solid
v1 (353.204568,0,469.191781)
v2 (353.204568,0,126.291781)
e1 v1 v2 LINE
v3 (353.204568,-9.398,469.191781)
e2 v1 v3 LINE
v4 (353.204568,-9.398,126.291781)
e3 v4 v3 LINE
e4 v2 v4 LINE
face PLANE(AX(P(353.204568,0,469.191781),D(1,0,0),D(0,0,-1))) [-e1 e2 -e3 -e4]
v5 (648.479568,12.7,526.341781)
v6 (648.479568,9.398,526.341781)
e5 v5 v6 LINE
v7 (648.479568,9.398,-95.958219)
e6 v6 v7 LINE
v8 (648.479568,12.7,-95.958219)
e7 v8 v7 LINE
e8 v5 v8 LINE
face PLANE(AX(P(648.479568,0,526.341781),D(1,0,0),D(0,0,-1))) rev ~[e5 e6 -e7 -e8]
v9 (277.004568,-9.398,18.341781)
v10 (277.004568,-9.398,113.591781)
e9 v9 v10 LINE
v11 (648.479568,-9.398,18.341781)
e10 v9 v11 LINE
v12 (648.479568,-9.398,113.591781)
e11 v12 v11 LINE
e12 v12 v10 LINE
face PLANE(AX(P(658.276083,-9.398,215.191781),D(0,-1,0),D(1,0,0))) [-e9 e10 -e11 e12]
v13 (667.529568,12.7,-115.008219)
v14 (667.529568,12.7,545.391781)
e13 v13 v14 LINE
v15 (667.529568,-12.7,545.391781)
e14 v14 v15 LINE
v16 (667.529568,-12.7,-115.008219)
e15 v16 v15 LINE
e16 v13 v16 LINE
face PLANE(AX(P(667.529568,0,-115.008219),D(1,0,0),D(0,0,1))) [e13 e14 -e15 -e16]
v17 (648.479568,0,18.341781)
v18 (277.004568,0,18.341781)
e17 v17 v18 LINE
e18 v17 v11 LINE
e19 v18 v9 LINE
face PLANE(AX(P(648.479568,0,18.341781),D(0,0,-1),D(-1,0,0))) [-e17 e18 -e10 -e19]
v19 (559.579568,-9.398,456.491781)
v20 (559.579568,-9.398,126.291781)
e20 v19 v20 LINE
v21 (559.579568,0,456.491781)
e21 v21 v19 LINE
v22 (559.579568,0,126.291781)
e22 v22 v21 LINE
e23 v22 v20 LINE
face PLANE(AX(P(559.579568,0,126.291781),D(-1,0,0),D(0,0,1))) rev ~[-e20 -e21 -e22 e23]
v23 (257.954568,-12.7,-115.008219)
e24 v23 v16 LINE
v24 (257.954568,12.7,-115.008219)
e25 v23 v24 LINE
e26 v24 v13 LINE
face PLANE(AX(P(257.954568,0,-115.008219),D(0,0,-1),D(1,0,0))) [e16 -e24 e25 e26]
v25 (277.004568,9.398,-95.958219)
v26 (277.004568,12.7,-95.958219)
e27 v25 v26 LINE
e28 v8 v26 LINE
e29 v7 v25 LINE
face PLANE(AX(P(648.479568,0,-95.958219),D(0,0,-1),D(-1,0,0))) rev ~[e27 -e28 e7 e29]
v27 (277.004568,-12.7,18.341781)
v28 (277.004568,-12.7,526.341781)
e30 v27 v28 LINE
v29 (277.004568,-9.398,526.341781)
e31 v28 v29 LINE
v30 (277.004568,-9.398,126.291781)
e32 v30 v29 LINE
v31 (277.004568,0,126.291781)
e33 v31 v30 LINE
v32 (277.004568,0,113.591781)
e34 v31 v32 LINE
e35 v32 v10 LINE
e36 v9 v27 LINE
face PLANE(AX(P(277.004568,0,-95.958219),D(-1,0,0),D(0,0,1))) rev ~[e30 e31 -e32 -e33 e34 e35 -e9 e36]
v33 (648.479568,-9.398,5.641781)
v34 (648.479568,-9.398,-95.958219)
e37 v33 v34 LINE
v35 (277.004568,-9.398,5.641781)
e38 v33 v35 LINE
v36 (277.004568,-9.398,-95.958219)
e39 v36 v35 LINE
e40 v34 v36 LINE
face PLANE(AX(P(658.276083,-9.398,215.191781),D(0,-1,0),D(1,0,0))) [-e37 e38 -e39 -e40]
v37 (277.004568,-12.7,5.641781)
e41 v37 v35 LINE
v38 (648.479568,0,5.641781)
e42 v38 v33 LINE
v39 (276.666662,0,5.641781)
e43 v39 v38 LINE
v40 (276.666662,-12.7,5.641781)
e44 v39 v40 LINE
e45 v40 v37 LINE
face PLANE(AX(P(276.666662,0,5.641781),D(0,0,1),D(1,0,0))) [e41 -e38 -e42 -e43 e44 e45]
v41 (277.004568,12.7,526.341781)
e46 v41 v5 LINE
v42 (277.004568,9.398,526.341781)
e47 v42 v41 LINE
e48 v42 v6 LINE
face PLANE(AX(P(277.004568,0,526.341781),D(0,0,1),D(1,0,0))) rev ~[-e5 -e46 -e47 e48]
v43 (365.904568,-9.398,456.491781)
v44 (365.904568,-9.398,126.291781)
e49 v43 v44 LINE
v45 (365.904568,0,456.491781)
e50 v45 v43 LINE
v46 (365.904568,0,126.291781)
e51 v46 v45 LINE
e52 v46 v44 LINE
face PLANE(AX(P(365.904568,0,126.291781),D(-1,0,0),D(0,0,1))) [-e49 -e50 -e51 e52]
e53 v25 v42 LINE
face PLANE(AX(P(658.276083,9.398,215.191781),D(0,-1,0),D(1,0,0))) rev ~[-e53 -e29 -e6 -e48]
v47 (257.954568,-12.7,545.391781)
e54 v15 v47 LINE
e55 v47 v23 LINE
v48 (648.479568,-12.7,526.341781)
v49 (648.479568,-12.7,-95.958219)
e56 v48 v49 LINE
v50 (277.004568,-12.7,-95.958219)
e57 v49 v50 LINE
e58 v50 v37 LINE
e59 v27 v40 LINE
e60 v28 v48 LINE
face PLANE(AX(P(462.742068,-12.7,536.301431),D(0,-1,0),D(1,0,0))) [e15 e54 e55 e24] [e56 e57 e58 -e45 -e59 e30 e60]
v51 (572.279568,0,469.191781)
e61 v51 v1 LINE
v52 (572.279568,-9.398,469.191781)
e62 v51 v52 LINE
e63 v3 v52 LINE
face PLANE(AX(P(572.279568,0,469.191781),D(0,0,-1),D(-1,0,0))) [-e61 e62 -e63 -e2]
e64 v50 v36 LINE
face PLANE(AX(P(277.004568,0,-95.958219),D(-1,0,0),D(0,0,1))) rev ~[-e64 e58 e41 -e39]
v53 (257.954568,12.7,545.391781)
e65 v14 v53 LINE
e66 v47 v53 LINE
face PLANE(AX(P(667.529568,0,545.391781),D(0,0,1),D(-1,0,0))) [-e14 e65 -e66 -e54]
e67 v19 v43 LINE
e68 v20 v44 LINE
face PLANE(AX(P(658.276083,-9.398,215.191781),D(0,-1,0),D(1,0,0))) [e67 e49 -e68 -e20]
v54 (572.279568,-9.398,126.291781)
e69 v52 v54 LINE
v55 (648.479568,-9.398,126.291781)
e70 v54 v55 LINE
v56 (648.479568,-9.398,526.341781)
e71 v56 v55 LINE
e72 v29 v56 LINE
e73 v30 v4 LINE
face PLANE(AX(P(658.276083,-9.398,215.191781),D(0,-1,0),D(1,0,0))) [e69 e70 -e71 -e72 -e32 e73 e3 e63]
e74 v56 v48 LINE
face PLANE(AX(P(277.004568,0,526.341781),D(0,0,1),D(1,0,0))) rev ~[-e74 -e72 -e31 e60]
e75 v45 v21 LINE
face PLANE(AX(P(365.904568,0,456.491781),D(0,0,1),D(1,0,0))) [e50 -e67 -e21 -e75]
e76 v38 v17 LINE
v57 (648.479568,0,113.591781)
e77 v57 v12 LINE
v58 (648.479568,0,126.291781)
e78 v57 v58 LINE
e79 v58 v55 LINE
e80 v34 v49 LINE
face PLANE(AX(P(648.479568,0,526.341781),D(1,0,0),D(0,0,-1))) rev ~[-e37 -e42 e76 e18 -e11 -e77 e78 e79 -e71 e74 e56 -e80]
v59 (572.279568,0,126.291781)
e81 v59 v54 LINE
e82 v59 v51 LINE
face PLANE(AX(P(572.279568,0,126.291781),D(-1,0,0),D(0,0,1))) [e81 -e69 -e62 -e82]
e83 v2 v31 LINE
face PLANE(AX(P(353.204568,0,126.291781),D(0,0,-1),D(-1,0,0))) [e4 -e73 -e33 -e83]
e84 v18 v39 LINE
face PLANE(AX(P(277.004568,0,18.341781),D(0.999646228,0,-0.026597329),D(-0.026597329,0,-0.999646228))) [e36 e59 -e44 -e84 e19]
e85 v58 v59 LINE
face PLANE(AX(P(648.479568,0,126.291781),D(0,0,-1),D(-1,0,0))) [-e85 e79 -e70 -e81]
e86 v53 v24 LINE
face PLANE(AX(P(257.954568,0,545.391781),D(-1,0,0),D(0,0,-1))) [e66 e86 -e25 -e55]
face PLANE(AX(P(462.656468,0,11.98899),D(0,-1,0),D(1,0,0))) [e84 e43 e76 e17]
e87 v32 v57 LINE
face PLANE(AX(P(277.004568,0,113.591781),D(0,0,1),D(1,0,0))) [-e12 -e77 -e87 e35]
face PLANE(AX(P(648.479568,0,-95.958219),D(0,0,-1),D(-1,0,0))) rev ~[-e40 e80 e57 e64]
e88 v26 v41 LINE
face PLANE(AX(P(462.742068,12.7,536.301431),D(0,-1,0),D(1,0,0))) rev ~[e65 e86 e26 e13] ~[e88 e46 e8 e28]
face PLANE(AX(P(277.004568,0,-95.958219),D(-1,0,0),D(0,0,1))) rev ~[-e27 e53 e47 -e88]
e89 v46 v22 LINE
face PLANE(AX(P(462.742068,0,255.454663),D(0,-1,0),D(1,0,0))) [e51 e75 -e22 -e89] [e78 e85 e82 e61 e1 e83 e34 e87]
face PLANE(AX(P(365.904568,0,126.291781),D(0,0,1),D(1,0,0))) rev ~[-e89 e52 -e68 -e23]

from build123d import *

# Parameters (mm, degrees)
F1_DEPTH      = 12.7
F1_DEPTH_BACK = 12.7
F0_W          = 371.475
F0_H          = 622.3
F2_DEPTH      = 9.398
F2_DEPTH_BACK = 9.398
F3_W          = 193.675
F3_H          = 330.2
F4_DEPTH      = 12.7


# Not quite as in the source:
# - a feature names something its author has since deleted; it is built from what else it names


with BuildPart() as f1:
    # F0 (on Front) → F1 (new body, two sides)
    with BuildSketch(Plane.XZ) as f1_sk:
        Polygon((277.0045676708, 526.3417813361), (648.4795676708, 526.3417813361), (667.5295676708, 545.3917813361), (257.9545676708, 545.3917813361), align=None)
        Polygon((277.0045676708, -95.9582186639), (277.0045676708, 526.3417813361), (257.9545676708, 545.3917813361), (257.9545676708, -115.0082186639), align=None)
        Polygon((667.5295676708, 545.3917813361), (648.4795676708, 526.3417813361), (648.4795676708, -95.9582186639), (667.5295676708, -115.0082186639), align=None)
        Polygon((667.5295676708, -115.0082186639), (648.4795676708, -95.9582186639), (277.0045676708, -95.9582186639), (257.9545676708, -115.0082186639), align=None)
    extrude(amount=-F1_DEPTH)
    extrude(f1_sk.sketch, amount=F1_DEPTH_BACK)

    # F0 (on Front) → F2 (join, two sides)
    with BuildSketch(Plane.XZ) as f2_sk:
        Polygon((667.5295676708, 545.3917813361), (648.4795676708, 526.3417813361), (648.4795676708, -95.9582186639), (667.5295676708, -115.0082186639), align=None)
        Polygon((277.0045676708, 526.3417813361), (648.4795676708, 526.3417813361), (667.5295676708, 545.3917813361), (257.9545676708, 545.3917813361), align=None)
        Polygon((667.5295676708, -115.0082186639), (648.4795676708, -95.9582186639), (277.0045676708, -95.9582186639), (257.9545676708, -115.0082186639), align=None)
        Polygon((277.0045676708, -95.9582186639), (277.0045676708, 526.3417813361), (257.9545676708, 545.3917813361), (257.9545676708, -115.0082186639), align=None)
        with Locations((462.7420676708, 215.1917813361)):
            Rectangle(F0_W, F0_H)
    extrude(amount=F2_DEPTH)
    extrude(f2_sk.sketch, amount=-F2_DEPTH_BACK)

    # F3 (on face) → F4 (cut)
    with BuildSketch(Plane.XZ):
        Polygon((276.66666205, 5.6417813361), (648.4795676708, 5.6417813361), (648.4795676708, 18.3417813361), (277.0045676708, 18.3417813361), align=None)
        Polygon((572.2795676708, 456.4917813361), (572.2795676708, 469.1917813361), (353.2045676708, 469.1917813361), (353.2045676708, 456.4917813361), (353.2045676708, 126.2917813361), (277.0045676708, 126.2917813361), (277.0045676708, 113.5917813361), (648.4795676708, 113.5917813361), (648.4795676708, 126.2917813361), (572.2795676708, 126.2917813361), align=None)
        with Locations((462.7420676708, 291.3917813361)):
            Rectangle(F3_W, F3_H, mode=Mode.SUBTRACT)
    extrude(amount=F4_DEPTH, mode=Mode.SUBTRACT)


solid = f1.part
